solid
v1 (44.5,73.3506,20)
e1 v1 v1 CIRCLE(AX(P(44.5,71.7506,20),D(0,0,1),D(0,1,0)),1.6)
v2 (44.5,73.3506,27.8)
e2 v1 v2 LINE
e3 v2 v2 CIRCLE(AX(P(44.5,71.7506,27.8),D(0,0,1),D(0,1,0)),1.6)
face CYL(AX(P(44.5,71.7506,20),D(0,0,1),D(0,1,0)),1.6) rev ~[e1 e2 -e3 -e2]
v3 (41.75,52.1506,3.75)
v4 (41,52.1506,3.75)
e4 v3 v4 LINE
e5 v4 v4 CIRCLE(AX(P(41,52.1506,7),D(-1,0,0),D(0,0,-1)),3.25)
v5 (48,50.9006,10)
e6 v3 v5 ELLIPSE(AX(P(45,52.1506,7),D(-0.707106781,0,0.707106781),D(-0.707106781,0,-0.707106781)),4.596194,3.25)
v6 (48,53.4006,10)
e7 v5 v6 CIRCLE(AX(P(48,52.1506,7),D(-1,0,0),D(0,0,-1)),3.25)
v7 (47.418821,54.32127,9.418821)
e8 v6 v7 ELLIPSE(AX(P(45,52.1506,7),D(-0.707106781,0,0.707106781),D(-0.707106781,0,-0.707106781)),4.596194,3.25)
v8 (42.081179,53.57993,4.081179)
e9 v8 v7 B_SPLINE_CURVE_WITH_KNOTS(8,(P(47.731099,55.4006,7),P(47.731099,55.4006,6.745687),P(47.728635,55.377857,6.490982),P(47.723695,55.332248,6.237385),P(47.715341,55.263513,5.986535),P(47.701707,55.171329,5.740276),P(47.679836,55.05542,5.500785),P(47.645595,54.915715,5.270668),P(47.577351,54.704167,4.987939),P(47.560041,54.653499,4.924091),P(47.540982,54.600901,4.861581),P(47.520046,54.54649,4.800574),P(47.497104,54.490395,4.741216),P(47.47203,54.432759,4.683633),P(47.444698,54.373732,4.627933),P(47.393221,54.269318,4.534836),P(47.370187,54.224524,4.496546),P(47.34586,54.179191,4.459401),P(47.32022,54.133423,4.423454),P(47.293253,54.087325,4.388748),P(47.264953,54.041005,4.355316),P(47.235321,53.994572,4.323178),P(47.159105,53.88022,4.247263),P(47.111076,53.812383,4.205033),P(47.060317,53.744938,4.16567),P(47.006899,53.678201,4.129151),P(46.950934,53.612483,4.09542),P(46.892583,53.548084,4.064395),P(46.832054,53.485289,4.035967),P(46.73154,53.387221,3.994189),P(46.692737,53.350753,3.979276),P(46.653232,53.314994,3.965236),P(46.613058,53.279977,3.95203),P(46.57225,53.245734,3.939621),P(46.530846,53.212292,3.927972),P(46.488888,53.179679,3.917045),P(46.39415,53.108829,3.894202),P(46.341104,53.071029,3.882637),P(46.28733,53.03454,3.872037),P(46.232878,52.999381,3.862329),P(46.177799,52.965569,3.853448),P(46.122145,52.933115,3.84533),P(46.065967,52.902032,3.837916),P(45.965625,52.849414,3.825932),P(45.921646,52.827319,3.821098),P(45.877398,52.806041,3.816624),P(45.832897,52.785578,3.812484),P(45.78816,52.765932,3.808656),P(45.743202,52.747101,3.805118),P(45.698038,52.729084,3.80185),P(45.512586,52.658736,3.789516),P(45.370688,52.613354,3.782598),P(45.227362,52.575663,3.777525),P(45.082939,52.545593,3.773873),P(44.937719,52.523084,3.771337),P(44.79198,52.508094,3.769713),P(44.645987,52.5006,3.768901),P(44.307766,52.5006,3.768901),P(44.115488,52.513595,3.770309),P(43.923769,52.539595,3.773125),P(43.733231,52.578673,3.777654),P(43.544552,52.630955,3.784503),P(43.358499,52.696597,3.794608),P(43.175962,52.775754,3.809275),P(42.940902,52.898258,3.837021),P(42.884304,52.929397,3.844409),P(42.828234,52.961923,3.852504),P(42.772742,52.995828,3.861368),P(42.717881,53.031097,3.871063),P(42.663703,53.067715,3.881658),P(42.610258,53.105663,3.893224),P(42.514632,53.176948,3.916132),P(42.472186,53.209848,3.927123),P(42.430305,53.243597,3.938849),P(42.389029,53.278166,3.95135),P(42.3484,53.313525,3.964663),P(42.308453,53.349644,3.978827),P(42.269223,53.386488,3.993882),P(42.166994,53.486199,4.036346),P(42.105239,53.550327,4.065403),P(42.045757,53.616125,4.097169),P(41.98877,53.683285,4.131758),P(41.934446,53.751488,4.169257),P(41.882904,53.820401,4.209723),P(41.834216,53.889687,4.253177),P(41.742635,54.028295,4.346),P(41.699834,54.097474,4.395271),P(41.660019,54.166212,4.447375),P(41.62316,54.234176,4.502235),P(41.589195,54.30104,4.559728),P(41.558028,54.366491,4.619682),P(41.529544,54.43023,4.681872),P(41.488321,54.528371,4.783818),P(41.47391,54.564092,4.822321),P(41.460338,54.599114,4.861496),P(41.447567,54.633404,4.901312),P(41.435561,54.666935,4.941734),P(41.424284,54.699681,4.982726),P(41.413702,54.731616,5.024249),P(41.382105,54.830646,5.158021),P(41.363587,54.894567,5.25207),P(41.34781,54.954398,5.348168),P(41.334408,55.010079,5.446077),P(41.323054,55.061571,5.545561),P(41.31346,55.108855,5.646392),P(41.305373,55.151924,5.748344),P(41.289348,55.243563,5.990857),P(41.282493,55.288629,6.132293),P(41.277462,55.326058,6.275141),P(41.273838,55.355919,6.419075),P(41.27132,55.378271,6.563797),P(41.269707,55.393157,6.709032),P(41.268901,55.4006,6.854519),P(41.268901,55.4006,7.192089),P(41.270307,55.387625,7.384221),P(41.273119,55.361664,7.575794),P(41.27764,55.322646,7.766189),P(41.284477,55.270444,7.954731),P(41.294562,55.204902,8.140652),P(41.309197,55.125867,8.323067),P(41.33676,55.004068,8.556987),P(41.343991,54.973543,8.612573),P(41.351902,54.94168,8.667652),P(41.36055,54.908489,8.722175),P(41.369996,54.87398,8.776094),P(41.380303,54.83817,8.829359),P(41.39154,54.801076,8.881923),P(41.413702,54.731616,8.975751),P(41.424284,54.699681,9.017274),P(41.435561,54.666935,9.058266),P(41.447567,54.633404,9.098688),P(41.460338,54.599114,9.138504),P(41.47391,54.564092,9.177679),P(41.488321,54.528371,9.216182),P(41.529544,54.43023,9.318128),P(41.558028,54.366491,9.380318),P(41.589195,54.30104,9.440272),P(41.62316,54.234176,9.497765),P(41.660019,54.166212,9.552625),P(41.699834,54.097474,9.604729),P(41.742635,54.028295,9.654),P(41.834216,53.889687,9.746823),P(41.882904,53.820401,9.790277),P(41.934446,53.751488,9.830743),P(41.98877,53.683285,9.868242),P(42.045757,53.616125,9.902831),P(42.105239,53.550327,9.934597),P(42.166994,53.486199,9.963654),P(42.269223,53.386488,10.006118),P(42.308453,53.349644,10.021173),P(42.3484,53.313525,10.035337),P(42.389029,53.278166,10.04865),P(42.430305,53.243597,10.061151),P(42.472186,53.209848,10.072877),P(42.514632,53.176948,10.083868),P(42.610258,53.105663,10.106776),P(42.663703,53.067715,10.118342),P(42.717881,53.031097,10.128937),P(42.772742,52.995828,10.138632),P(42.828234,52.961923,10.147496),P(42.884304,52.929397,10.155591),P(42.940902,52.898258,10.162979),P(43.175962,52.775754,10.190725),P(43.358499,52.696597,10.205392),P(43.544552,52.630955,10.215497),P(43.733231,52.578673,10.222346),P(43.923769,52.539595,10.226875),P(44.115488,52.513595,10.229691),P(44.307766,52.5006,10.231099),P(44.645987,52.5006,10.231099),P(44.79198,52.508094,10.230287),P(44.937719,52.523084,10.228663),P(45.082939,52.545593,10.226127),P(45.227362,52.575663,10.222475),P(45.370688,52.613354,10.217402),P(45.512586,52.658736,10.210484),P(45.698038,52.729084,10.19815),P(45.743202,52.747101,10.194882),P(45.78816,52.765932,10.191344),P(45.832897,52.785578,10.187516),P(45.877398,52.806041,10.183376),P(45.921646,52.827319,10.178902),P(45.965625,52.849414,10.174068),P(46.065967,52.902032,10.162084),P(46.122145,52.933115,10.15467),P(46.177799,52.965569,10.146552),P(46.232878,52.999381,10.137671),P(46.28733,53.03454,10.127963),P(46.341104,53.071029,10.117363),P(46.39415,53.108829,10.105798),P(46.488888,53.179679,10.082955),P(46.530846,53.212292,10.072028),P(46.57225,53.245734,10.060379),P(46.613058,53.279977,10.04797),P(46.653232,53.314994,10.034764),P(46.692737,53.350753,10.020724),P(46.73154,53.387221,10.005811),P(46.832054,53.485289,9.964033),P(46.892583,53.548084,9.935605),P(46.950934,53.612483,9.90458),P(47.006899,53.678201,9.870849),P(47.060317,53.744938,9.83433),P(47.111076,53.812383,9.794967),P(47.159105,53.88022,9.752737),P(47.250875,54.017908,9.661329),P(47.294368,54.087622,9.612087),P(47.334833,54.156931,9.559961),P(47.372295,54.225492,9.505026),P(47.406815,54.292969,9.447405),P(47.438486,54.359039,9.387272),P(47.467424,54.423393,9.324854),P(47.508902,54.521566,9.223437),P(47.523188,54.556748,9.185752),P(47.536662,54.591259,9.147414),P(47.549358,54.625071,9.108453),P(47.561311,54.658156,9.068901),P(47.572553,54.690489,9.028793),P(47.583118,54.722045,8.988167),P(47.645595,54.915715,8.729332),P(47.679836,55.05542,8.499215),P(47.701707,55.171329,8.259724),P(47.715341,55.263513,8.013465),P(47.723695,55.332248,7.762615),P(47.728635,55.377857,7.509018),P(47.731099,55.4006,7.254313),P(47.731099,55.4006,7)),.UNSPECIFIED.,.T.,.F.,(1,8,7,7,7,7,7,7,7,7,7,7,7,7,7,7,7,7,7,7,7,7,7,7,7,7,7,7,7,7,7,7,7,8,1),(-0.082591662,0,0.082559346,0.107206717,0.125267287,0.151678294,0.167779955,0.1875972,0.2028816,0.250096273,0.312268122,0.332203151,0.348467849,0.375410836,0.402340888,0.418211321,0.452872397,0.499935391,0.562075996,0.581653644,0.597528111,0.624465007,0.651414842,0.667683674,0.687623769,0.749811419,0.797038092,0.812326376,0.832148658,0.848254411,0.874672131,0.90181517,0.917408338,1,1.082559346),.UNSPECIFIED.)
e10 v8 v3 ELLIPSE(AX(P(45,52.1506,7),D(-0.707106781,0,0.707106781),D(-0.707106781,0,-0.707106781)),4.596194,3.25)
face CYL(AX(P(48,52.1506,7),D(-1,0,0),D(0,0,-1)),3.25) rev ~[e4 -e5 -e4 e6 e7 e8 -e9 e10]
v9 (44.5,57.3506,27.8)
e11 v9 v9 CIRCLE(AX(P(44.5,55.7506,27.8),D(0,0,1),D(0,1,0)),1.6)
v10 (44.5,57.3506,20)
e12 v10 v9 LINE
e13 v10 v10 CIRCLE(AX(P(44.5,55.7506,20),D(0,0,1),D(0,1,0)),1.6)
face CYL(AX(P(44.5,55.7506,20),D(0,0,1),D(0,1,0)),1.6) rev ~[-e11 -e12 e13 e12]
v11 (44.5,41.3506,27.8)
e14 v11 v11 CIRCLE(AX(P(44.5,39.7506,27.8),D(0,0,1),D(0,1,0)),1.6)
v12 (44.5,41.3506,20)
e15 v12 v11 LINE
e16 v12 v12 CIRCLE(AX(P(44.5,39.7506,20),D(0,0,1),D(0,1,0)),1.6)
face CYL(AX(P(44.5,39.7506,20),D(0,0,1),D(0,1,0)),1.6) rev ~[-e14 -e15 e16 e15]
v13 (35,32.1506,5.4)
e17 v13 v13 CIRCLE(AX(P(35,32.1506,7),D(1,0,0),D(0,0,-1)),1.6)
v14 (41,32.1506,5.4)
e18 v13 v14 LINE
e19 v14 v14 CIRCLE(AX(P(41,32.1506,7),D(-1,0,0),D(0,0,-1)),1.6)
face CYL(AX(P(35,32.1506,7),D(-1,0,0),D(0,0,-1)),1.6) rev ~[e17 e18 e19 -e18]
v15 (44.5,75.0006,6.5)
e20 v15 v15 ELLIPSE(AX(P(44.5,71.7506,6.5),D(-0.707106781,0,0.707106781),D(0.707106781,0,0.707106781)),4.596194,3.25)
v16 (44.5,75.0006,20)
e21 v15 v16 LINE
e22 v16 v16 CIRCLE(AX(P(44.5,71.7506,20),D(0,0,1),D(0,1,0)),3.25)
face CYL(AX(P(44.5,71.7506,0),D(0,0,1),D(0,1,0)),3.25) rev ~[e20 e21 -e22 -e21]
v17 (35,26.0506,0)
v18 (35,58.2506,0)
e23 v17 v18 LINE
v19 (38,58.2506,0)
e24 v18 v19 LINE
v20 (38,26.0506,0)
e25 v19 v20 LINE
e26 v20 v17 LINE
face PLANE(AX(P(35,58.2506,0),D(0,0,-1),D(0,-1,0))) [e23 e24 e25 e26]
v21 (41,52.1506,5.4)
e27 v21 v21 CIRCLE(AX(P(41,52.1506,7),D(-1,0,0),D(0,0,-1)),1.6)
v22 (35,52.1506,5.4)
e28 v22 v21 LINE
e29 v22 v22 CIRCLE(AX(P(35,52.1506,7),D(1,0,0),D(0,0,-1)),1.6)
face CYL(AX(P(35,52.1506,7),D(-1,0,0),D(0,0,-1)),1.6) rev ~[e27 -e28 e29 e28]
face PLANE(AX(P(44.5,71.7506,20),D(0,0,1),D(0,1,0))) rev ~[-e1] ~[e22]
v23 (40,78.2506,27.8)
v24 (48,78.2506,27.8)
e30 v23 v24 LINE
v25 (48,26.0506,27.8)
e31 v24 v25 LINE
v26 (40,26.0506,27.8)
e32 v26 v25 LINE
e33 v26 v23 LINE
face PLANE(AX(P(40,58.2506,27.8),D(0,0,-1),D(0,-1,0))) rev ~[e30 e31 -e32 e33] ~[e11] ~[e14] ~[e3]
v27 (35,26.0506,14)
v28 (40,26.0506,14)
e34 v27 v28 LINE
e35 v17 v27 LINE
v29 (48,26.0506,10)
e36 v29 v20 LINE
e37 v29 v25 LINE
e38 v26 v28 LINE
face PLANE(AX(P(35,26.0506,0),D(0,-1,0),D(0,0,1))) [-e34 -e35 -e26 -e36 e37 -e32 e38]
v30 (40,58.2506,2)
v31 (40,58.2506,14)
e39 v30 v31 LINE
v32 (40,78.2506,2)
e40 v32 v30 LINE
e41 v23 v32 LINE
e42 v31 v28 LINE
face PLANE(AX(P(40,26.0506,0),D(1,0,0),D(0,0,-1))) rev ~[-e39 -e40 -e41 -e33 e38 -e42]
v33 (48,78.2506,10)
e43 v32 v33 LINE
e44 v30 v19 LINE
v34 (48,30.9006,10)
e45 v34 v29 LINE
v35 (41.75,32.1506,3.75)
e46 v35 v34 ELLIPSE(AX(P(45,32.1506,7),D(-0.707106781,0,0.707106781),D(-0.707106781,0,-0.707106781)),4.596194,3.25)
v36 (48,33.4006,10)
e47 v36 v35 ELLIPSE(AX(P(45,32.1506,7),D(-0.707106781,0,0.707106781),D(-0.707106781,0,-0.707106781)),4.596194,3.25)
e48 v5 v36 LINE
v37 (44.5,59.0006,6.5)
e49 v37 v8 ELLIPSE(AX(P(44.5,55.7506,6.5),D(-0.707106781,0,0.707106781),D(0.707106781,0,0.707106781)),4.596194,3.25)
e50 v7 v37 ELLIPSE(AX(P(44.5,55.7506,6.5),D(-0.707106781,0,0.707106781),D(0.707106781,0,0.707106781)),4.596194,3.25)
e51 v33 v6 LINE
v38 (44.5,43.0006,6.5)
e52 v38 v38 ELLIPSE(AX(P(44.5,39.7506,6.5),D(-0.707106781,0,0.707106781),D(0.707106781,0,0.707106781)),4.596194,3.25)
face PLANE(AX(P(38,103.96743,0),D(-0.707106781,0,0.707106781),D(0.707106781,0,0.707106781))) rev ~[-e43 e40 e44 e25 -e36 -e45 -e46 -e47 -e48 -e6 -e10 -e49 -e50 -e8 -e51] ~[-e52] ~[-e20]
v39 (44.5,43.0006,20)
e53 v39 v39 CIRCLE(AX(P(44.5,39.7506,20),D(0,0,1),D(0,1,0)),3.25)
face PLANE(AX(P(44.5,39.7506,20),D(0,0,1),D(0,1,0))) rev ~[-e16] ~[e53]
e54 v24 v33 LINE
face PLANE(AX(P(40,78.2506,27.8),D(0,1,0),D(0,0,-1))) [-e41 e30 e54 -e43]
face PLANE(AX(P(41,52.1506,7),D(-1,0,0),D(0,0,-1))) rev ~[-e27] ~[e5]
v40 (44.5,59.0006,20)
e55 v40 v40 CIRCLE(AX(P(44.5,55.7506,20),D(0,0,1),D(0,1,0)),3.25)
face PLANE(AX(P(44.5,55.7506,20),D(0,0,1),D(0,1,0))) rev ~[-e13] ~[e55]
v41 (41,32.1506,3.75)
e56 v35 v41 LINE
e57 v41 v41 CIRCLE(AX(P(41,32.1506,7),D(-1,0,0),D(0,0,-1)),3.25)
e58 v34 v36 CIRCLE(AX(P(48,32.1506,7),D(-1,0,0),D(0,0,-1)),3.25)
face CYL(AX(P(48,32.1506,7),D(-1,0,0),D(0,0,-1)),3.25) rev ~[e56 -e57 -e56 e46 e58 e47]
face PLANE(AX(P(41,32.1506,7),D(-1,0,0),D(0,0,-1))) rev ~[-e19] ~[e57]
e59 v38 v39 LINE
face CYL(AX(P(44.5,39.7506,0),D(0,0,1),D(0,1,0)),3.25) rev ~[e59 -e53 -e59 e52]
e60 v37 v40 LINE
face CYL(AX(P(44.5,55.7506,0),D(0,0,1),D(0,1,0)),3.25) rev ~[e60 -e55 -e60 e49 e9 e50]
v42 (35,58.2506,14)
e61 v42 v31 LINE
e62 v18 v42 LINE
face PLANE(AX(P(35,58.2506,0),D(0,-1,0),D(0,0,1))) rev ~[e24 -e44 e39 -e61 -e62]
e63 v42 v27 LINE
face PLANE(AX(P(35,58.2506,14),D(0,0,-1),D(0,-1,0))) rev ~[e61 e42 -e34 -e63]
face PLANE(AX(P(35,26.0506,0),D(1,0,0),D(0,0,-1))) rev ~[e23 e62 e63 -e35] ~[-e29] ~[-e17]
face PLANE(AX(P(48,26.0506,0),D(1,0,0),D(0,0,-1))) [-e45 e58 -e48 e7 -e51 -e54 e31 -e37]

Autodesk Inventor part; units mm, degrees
ref_plane "YZ Plane" through (0, 0, 0) normal (1, 0, 0) x (0, 1, 0)
ref_plane "XZ Plane" through (0, 0, 0) normal (0, 1, 0) x (-1, 0, 0)
ref_plane "XY Plane" through (0, 0, 0) normal (0, 0, 1) x (1, 0, 0)
ref_plane "Arbeitsebene2" through (35, 26.0506, 0) normal (1, 0, 0) x (0, 0, -1)
sketch "Skizze6" plane through (35, 26.0506, 0) normal (1, 0, 0) x (0, 0, -1)
  line L0 (-14, 32.2) -> (-14, 0) projected
  line L1 (0, 0) -> (-14, 0) projected
  line L2 (0, 32.2) -> (0, 0) projected
  line L3 (0, 32.2) -> (-14, 32.2) projected
  line L4 (-8.5, 27.35) -> (0, 27.35)
  line L5 (-8.5, 24.85) -> (0, 24.85)
  line L6 (-8.5, 7.35) -> (0, 7.35)
  line L7 (-8.5, 4.85) -> (0, 4.85)
  circle A0 centre (-7, 26.1) radius 1.6
  circle A1 centre (-7, 6.1) radius 1.6
  point P0 (0, -26.0506)
  dimension "d40" = 3.2
  dimension "d41" = 3.2
  dimension "d42" = 1.25
  dimension "d43" = 1.25
  dimension "d44" = 7
  dimension "d45" = 7
extrude "Extrusion6" add sketch "Skizze6" along normal blind 5 contours L3 L2 L4 A0 L5 L6 A1 L7 L1 L0 | L2 L5 A0 L4 | L7 A1 L6 L2
sketch "Skizze7" plane through (40, 26.0506, 0) normal (1, 0, 0) x (0, 0, -1)
  line L0 (0, 32.2) -> (-14, 32.2) projected
  line L1 (-14, 32.2) -> (-14, 0) projected
  line L2 (-14, 0) -> (0, 0) projected
  line L3 (0, 0) -> (0, 32.2) projected
  circle A0 centre (-7, 26.1) radius 1.6 projected
  circle A1 centre (-7, 6.1) radius 1.6 projected
  line L4 (-58.75, 26.0265) -> (-58.75, 86.0265) projected
  line L5 (0, 32.2) -> (-27.8, 32.2)
  line L6 (-27.8, 32.2) -> (-27.8, 0)
  line L7 (-27.8, 0) -> (0, 0)
  line L8 (0, 0) -> (0, 32.2)
  line L9 (0, 32.2) -> (-14, 32.2) projected
  line L10 (0, 32.2) -> (-27.8, 32.2)
  line L11 (-27.8, 32.2) -> (-27.8, 52.2)
  line L12 (-27.8, 52.2) -> (0, 52.2)
  line L13 (0, 52.2) -> (0, 32.2)
  point P0 (0, -26.0506)
  point P1 (-14, 0)
  point P2 (-14, 32.2)
  dimension "d48" = 27.8
  dimension "d51" = 20
extrude "Extrusion7" add sketch "Skizze7" along normal blind 8
sketch "Skizze8" plane through (35, 26.0506, 0) normal (0, 0, -1) x (-1, 0, 0)
  line L0 (-13, 24.5) -> (0, 24.5) projected
  line L1 (-13, 27.7) -> (0, 27.7) projected
  line L2 (-13, 7.7) -> (0, 7.7) projected
  line L3 (-13, 4.5) -> (0, 4.5) projected
  line L4 (0, 0) -> (0, 32.2) projected
  line L5 (0, 32.2) -> (-5, 32.2) projected
  line L6 (-5, 32.2) -> (-5, 52.2) projected
  line L7 (-5, 52.2) -> (-13, 52.2) projected
  line L8 (-13, 0) -> (-13, 52.2) projected
  line L9 (0, 0) -> (-13, 0) projected
  circle A0 centre (-9.5, 39.8052) radius 1.6 construction
  circle A1 centre (-9.5, 13.7) radius 1.4 construction
  circle A2 centre (-9.5, 29.7) radius 1.4 construction
  circle A3 centre (-9.5, 45.7) radius 1.4 construction
  point P0 (35, -26.0506)
  dimension "d52" = 2.8
  dimension "d53" = 3.5
  dimension "d54" = 6
  dimension "d55" = 2.8
  dimension "d56" = 16
  dimension "d57" = 2.8
  dimension "d58" = 16
hole "Bohrung1" at (44.5, 39.7506, 0) at (44.5, 55.7506, 0) at (44.5, 71.7506, 0) direction (0, 0, 1) diameter 3.2 end through all counterbore diameter 6.5 counterbore depth 20
chamfer "Fase4" distance 10 angle 45 1 edges at (48, 52.1506, 0)
sketch "Skizze9" plane through (48, 26.0506, 0) normal (1, 0, 0) x (0, 0, -1)
  circle A0 centre (-7, 6.1) radius 1.6 projected
  arc A1 (-8.3185, 27.0064) -> (-5.4844, 26.6128) centre (-7, 26.1) ccw projected
  point P0 (0, -26.0506)
hole "Bohrung2" at (48, 32.1506, 7) at (48, 52.1506, 7) direction (-1, 0, 0) diameter 3.2 end through all counterbore diameter 6.5 counterbore depth 7
properties part number "30_XYTable_Aliexpress_Translatorarm_y"
